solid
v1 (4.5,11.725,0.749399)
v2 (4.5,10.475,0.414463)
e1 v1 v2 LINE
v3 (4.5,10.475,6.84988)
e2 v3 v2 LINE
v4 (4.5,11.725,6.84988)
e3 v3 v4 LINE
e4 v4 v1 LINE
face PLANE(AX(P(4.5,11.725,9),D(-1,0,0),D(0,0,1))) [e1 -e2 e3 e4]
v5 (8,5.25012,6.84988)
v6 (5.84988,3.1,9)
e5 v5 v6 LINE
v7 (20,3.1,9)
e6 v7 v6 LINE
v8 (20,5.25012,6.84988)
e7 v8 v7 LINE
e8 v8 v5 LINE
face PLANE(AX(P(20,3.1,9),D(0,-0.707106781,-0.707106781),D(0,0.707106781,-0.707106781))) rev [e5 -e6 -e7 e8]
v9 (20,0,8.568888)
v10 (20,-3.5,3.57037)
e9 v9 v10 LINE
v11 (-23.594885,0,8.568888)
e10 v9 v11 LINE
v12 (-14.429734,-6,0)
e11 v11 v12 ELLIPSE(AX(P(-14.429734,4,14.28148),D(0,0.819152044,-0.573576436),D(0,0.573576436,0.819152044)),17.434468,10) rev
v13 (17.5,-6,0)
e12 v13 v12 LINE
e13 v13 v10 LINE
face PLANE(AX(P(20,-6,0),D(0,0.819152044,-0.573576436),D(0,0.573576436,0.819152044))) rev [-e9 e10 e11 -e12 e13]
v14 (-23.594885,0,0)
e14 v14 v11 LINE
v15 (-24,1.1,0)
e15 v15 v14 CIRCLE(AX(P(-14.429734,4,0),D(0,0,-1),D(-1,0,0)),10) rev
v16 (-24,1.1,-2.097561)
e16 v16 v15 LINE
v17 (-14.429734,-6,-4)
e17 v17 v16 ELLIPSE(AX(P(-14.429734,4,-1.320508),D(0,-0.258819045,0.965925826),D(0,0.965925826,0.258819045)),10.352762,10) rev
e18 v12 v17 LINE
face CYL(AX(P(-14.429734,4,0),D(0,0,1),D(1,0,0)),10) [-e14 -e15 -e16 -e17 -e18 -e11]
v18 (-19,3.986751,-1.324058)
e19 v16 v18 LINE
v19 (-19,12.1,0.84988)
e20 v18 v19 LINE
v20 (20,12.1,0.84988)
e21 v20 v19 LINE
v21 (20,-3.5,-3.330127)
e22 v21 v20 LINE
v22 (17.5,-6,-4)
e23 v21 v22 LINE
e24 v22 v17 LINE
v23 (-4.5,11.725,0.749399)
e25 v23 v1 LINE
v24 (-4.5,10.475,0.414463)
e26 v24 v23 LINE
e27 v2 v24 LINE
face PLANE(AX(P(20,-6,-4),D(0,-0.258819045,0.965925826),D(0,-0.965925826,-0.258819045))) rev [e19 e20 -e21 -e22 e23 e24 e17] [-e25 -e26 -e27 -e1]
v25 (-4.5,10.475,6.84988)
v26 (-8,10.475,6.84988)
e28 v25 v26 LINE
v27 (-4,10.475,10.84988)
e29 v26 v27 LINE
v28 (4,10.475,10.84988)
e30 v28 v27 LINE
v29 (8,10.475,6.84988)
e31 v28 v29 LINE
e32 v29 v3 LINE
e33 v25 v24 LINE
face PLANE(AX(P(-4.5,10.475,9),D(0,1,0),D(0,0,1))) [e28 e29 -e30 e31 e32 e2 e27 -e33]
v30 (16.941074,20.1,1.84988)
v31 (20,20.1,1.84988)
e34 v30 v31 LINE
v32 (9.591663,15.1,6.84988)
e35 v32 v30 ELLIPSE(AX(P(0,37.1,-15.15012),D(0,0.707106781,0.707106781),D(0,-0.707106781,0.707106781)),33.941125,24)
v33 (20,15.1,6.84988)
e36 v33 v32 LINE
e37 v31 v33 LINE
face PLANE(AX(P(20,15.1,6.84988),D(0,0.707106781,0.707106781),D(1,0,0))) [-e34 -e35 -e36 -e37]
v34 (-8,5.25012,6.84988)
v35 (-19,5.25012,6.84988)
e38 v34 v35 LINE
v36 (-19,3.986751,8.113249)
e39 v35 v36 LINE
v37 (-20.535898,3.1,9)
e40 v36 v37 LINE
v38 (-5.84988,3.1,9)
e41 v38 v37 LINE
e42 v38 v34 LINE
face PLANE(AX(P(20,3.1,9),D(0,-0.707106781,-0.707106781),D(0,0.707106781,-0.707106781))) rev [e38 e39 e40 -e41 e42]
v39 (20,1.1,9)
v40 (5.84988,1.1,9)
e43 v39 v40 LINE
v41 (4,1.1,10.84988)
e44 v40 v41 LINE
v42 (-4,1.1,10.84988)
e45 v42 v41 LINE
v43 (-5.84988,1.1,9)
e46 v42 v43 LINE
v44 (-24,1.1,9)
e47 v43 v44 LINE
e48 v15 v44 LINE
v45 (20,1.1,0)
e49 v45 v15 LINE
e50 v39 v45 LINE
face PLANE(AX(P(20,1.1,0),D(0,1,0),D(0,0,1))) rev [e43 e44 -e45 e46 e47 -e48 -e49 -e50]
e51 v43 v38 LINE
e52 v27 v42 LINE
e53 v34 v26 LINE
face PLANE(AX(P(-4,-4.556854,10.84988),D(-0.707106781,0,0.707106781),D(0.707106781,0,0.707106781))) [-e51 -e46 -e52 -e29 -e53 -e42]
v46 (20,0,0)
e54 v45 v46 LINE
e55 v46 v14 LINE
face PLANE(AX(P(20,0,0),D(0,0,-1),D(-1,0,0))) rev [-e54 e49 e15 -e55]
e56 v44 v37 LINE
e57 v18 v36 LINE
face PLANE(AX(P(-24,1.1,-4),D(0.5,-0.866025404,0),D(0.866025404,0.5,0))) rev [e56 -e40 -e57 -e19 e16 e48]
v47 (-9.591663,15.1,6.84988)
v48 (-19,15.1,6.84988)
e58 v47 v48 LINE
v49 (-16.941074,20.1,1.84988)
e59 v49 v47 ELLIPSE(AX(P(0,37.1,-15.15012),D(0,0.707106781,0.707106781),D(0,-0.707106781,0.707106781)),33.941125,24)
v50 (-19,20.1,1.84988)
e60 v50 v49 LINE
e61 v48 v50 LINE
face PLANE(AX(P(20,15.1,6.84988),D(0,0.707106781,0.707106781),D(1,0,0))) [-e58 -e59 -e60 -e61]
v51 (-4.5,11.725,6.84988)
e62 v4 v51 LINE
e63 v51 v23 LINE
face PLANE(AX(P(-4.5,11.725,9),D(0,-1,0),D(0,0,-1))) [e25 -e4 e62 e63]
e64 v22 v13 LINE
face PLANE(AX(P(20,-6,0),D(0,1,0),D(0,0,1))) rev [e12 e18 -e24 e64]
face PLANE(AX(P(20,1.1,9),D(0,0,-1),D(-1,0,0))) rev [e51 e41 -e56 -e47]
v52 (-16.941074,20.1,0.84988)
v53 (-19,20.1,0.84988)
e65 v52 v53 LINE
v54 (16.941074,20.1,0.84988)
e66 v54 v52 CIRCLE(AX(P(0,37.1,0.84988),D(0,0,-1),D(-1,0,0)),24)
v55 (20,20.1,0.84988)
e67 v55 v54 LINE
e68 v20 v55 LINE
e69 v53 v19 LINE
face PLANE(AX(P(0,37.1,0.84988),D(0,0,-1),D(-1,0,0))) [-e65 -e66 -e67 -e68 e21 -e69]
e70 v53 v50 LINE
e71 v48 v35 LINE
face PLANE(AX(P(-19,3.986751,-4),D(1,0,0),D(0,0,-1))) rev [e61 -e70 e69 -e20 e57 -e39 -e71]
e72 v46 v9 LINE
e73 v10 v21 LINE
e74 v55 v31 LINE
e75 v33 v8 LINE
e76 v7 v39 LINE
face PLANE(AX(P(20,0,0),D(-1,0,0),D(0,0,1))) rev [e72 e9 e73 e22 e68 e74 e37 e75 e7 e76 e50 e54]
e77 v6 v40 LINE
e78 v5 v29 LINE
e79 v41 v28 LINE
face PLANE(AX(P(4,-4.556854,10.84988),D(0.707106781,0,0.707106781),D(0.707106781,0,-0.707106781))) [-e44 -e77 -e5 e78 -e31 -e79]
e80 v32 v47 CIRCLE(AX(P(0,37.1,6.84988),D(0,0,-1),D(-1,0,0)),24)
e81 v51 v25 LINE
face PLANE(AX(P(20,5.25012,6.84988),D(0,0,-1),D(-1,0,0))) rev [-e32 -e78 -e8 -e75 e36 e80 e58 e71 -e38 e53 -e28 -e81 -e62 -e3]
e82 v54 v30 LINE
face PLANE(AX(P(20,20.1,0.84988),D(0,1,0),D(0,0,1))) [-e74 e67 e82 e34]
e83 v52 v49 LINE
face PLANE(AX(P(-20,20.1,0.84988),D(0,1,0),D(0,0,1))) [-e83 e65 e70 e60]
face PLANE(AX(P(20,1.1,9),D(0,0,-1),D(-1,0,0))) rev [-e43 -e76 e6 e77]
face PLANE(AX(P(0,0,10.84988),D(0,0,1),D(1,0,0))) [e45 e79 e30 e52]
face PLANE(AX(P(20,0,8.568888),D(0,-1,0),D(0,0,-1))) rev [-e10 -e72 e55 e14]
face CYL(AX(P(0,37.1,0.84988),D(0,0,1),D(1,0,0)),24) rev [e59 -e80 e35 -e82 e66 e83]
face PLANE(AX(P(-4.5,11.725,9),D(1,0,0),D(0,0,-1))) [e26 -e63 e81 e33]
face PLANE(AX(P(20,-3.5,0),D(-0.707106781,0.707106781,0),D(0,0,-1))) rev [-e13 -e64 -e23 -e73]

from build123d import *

# Parameters (mm, degrees)
BOSS_EXTRUDE1_DEPTH     = 20
BOSS_EXTRUDE4_DEPTH     = 6
CHAMFER4_SIZE           = 5
BOSS_EXTRUDE5_DEPTH     = 4
CUT_EXTRUDE4_DEPTH      = 33.573148451
CUT_EXTRUDE4_DEPTH_BACK = 33.573148451
FILLET1_R               = 10
CHAMFER5_SIZE           = 2.5
SKETCH17_W              = 9
SKETCH17_H              = 1.25
CUT_EXTRUDE5_DEPTH      = 33.573148451
SKETCH18_W              = 8
SKETCH18_H              = 9.375
BOSS_EXTRUDE6_DEPTH     = 4
BOSS_EXTRUDE8_REACH     = 33.067


with BuildPart() as part:
    # Sketch1 → Boss-Extrude1 (new, symmetric)
    with BuildSketch(Plane(origin=(0, 0, 0), x_dir=(0, 0, -1), z_dir=(1, 0, 0))):
        Polygon((0, -6), (4, -6), (-0.849880383, 12.1), (-6.849880383, 12.1), (-6.849880383, 5.250119617), (-9, 3.1), (-9, 1.1), (0, 1.1), (0, 0), (-8.56888804, 0), align=None)
    extrude(amount=BOSS_EXTRUDE1_DEPTH, both=True)

    # Sketch7 → Boss-Extrude4 (add)
    with BuildSketch(Plane.XY.offset(6.849880383)):
        with BuildLine():
            Line((-20, 12.1), (-20, 20.1))
            Line((-20, 20.1), (-16.941074346, 20.1))
            ThreePointArc((-16.941074346, 20.1), (0, 13.1), (16.941074346, 20.1))
            Line((16.941074346, 20.1), (20, 20.1))
            Line((20, 20.1), (20, 12.1))
            Line((20, 12.1), (-20, 12.1))
        make_face()
    extrude(amount=-BOSS_EXTRUDE4_DEPTH)

    # Chamfer4
    chamfer4_edges = [part.edges().sort_by_distance(p)[0] for p in [
        (-18.470537173, 20.1, 6.849880383),
        (18.470537173, 20.1, 6.849880383),
    ]]
    chamfer(chamfer4_edges, length=CHAMFER4_SIZE)

    # Sketch15 → Boss-Extrude5 (add)
    with BuildSketch(Plane.ZY.offset(20)):
        Polygon((9, 1.1), (9, 3.1), (6.849880383, 5.250119617), (6.849880383, 15.1), (1.849880383, 20.1), (0.849880383, 20.1), (0.849880383, 12.1), (-4, -6), (0, -6), (8.56888804, 0), (0, 0), (0, 1.1), align=None)
    extrude(amount=BOSS_EXTRUDE5_DEPTH)

    # Sketch16 → Cut-Extrude4 (cut, two sides: drawn at the far end of the back side and taken through both)
    with BuildSketch(Plane.XY.offset(-CUT_EXTRUDE4_DEPTH_BACK)):
        Polygon((-24, 1.1), (-19, 3.986751346), (-19, 20.1), (-24, 20.1), align=None)
    extrude(amount=CUT_EXTRUDE4_DEPTH + CUT_EXTRUDE4_DEPTH_BACK, mode=Mode.SUBTRACT)

    # Fillet1
    # the kernel refuses this fillet: 10 mm, written as the material it takes off along each edge
    with BuildSketch(Plane(origin=(-24, -6, -27.925666135), x_dir=(1, 0, 0), z_dir=(0, 0, 1))) as fillet1_piece_1:
        with BuildLine():
            CenterArc((9.570266454, 10), FILLET1_R, 196.857956022, 73.142043978)
            Line((0, 7.1), (-0.191405329, 7.042))
            ThreePointArc((-0.191405329, 7.042), (-0.2, 3.55), (-0.2, 0))
            Line((-0.2, 0), (0, -0.2))
            Line((0, -0.2), (9.570266454, -0.2))
            Line((9.570266454, -0.2), (9.570266454, 0))
        make_face()
    extrude(amount=51.85133227, mode=Mode.SUBTRACT)

    # Chamfer5
    chamfer5_edges = [part.edges().sort_by_distance(p)[0] for p in [
        (20, -6, -2),
    ]]
    chamfer(chamfer5_edges, length=CHAMFER5_SIZE)

    # Sketch17 → Cut-Extrude5 (cut, through all)
    with BuildSketch(Plane.XY):
        with Locations((0, 11.1)):
            Rectangle(SKETCH17_W, SKETCH17_H)
    extrude(amount=CUT_EXTRUDE5_DEPTH, mode=Mode.SUBTRACT)

    # Sketch18 → Boss-Extrude6 (add)
    with BuildSketch(Plane.XY.offset(6.849880383)):
        with Locations((0, 5.7875)):
            Rectangle(SKETCH18_W, SKETCH18_H)
    extrude(amount=BOSS_EXTRUDE6_DEPTH)

    # Boss-Extrude8: up to this face of the body (flat: up to its plane)
    boss_extrude8_end = Plane(part.part.faces().sort_by_distance((-1.927949963, 1.1, 4.69543357))[0])
    # Sketch19 → Boss-Extrude8 (add, up to the picked face)
    with BuildSketch(Plane(origin=(0, 10.475, 0), x_dir=(1, 0, 0), z_dir=(0, 1, 0)), mode=Mode.PRIVATE) as boss_extrude8_sk1:
        Polygon((4, -6.849880383), (4, -10.849880383), (8, -6.849880383), align=None)
    boss_extrude8_tool1 = split(extrude(boss_extrude8_sk1.sketch, amount=-BOSS_EXTRUDE8_REACH, mode=Mode.PRIVATE), bisect_by=boss_extrude8_end, keep=Keep.BOTH, mode=Mode.PRIVATE)
    # Sketch19 → Boss-Extrude8 (add, up to the picked face)
    with BuildSketch(Plane(origin=(0, 10.475, 0), x_dir=(1, 0, 0), z_dir=(0, 1, 0)), mode=Mode.PRIVATE) as boss_extrude8_sk2:
        Polygon((-4, -6.849880383), (-8, -6.849880383), (-4, -10.849880383), align=None)
    boss_extrude8_tool2 = split(extrude(boss_extrude8_sk2.sketch, amount=-BOSS_EXTRUDE8_REACH, mode=Mode.PRIVATE), bisect_by=boss_extrude8_end, keep=Keep.BOTH, mode=Mode.PRIVATE)
    add(boss_extrude8_tool1.solids().sort_by(Axis((5.333333, 10.475, 8.183214), (0, -1, 0)))[0])
    add(boss_extrude8_tool2.solids().sort_by(Axis((-5.333333, 10.475, 8.183214), (0, -1, 0)))[0])


solid = part.part
